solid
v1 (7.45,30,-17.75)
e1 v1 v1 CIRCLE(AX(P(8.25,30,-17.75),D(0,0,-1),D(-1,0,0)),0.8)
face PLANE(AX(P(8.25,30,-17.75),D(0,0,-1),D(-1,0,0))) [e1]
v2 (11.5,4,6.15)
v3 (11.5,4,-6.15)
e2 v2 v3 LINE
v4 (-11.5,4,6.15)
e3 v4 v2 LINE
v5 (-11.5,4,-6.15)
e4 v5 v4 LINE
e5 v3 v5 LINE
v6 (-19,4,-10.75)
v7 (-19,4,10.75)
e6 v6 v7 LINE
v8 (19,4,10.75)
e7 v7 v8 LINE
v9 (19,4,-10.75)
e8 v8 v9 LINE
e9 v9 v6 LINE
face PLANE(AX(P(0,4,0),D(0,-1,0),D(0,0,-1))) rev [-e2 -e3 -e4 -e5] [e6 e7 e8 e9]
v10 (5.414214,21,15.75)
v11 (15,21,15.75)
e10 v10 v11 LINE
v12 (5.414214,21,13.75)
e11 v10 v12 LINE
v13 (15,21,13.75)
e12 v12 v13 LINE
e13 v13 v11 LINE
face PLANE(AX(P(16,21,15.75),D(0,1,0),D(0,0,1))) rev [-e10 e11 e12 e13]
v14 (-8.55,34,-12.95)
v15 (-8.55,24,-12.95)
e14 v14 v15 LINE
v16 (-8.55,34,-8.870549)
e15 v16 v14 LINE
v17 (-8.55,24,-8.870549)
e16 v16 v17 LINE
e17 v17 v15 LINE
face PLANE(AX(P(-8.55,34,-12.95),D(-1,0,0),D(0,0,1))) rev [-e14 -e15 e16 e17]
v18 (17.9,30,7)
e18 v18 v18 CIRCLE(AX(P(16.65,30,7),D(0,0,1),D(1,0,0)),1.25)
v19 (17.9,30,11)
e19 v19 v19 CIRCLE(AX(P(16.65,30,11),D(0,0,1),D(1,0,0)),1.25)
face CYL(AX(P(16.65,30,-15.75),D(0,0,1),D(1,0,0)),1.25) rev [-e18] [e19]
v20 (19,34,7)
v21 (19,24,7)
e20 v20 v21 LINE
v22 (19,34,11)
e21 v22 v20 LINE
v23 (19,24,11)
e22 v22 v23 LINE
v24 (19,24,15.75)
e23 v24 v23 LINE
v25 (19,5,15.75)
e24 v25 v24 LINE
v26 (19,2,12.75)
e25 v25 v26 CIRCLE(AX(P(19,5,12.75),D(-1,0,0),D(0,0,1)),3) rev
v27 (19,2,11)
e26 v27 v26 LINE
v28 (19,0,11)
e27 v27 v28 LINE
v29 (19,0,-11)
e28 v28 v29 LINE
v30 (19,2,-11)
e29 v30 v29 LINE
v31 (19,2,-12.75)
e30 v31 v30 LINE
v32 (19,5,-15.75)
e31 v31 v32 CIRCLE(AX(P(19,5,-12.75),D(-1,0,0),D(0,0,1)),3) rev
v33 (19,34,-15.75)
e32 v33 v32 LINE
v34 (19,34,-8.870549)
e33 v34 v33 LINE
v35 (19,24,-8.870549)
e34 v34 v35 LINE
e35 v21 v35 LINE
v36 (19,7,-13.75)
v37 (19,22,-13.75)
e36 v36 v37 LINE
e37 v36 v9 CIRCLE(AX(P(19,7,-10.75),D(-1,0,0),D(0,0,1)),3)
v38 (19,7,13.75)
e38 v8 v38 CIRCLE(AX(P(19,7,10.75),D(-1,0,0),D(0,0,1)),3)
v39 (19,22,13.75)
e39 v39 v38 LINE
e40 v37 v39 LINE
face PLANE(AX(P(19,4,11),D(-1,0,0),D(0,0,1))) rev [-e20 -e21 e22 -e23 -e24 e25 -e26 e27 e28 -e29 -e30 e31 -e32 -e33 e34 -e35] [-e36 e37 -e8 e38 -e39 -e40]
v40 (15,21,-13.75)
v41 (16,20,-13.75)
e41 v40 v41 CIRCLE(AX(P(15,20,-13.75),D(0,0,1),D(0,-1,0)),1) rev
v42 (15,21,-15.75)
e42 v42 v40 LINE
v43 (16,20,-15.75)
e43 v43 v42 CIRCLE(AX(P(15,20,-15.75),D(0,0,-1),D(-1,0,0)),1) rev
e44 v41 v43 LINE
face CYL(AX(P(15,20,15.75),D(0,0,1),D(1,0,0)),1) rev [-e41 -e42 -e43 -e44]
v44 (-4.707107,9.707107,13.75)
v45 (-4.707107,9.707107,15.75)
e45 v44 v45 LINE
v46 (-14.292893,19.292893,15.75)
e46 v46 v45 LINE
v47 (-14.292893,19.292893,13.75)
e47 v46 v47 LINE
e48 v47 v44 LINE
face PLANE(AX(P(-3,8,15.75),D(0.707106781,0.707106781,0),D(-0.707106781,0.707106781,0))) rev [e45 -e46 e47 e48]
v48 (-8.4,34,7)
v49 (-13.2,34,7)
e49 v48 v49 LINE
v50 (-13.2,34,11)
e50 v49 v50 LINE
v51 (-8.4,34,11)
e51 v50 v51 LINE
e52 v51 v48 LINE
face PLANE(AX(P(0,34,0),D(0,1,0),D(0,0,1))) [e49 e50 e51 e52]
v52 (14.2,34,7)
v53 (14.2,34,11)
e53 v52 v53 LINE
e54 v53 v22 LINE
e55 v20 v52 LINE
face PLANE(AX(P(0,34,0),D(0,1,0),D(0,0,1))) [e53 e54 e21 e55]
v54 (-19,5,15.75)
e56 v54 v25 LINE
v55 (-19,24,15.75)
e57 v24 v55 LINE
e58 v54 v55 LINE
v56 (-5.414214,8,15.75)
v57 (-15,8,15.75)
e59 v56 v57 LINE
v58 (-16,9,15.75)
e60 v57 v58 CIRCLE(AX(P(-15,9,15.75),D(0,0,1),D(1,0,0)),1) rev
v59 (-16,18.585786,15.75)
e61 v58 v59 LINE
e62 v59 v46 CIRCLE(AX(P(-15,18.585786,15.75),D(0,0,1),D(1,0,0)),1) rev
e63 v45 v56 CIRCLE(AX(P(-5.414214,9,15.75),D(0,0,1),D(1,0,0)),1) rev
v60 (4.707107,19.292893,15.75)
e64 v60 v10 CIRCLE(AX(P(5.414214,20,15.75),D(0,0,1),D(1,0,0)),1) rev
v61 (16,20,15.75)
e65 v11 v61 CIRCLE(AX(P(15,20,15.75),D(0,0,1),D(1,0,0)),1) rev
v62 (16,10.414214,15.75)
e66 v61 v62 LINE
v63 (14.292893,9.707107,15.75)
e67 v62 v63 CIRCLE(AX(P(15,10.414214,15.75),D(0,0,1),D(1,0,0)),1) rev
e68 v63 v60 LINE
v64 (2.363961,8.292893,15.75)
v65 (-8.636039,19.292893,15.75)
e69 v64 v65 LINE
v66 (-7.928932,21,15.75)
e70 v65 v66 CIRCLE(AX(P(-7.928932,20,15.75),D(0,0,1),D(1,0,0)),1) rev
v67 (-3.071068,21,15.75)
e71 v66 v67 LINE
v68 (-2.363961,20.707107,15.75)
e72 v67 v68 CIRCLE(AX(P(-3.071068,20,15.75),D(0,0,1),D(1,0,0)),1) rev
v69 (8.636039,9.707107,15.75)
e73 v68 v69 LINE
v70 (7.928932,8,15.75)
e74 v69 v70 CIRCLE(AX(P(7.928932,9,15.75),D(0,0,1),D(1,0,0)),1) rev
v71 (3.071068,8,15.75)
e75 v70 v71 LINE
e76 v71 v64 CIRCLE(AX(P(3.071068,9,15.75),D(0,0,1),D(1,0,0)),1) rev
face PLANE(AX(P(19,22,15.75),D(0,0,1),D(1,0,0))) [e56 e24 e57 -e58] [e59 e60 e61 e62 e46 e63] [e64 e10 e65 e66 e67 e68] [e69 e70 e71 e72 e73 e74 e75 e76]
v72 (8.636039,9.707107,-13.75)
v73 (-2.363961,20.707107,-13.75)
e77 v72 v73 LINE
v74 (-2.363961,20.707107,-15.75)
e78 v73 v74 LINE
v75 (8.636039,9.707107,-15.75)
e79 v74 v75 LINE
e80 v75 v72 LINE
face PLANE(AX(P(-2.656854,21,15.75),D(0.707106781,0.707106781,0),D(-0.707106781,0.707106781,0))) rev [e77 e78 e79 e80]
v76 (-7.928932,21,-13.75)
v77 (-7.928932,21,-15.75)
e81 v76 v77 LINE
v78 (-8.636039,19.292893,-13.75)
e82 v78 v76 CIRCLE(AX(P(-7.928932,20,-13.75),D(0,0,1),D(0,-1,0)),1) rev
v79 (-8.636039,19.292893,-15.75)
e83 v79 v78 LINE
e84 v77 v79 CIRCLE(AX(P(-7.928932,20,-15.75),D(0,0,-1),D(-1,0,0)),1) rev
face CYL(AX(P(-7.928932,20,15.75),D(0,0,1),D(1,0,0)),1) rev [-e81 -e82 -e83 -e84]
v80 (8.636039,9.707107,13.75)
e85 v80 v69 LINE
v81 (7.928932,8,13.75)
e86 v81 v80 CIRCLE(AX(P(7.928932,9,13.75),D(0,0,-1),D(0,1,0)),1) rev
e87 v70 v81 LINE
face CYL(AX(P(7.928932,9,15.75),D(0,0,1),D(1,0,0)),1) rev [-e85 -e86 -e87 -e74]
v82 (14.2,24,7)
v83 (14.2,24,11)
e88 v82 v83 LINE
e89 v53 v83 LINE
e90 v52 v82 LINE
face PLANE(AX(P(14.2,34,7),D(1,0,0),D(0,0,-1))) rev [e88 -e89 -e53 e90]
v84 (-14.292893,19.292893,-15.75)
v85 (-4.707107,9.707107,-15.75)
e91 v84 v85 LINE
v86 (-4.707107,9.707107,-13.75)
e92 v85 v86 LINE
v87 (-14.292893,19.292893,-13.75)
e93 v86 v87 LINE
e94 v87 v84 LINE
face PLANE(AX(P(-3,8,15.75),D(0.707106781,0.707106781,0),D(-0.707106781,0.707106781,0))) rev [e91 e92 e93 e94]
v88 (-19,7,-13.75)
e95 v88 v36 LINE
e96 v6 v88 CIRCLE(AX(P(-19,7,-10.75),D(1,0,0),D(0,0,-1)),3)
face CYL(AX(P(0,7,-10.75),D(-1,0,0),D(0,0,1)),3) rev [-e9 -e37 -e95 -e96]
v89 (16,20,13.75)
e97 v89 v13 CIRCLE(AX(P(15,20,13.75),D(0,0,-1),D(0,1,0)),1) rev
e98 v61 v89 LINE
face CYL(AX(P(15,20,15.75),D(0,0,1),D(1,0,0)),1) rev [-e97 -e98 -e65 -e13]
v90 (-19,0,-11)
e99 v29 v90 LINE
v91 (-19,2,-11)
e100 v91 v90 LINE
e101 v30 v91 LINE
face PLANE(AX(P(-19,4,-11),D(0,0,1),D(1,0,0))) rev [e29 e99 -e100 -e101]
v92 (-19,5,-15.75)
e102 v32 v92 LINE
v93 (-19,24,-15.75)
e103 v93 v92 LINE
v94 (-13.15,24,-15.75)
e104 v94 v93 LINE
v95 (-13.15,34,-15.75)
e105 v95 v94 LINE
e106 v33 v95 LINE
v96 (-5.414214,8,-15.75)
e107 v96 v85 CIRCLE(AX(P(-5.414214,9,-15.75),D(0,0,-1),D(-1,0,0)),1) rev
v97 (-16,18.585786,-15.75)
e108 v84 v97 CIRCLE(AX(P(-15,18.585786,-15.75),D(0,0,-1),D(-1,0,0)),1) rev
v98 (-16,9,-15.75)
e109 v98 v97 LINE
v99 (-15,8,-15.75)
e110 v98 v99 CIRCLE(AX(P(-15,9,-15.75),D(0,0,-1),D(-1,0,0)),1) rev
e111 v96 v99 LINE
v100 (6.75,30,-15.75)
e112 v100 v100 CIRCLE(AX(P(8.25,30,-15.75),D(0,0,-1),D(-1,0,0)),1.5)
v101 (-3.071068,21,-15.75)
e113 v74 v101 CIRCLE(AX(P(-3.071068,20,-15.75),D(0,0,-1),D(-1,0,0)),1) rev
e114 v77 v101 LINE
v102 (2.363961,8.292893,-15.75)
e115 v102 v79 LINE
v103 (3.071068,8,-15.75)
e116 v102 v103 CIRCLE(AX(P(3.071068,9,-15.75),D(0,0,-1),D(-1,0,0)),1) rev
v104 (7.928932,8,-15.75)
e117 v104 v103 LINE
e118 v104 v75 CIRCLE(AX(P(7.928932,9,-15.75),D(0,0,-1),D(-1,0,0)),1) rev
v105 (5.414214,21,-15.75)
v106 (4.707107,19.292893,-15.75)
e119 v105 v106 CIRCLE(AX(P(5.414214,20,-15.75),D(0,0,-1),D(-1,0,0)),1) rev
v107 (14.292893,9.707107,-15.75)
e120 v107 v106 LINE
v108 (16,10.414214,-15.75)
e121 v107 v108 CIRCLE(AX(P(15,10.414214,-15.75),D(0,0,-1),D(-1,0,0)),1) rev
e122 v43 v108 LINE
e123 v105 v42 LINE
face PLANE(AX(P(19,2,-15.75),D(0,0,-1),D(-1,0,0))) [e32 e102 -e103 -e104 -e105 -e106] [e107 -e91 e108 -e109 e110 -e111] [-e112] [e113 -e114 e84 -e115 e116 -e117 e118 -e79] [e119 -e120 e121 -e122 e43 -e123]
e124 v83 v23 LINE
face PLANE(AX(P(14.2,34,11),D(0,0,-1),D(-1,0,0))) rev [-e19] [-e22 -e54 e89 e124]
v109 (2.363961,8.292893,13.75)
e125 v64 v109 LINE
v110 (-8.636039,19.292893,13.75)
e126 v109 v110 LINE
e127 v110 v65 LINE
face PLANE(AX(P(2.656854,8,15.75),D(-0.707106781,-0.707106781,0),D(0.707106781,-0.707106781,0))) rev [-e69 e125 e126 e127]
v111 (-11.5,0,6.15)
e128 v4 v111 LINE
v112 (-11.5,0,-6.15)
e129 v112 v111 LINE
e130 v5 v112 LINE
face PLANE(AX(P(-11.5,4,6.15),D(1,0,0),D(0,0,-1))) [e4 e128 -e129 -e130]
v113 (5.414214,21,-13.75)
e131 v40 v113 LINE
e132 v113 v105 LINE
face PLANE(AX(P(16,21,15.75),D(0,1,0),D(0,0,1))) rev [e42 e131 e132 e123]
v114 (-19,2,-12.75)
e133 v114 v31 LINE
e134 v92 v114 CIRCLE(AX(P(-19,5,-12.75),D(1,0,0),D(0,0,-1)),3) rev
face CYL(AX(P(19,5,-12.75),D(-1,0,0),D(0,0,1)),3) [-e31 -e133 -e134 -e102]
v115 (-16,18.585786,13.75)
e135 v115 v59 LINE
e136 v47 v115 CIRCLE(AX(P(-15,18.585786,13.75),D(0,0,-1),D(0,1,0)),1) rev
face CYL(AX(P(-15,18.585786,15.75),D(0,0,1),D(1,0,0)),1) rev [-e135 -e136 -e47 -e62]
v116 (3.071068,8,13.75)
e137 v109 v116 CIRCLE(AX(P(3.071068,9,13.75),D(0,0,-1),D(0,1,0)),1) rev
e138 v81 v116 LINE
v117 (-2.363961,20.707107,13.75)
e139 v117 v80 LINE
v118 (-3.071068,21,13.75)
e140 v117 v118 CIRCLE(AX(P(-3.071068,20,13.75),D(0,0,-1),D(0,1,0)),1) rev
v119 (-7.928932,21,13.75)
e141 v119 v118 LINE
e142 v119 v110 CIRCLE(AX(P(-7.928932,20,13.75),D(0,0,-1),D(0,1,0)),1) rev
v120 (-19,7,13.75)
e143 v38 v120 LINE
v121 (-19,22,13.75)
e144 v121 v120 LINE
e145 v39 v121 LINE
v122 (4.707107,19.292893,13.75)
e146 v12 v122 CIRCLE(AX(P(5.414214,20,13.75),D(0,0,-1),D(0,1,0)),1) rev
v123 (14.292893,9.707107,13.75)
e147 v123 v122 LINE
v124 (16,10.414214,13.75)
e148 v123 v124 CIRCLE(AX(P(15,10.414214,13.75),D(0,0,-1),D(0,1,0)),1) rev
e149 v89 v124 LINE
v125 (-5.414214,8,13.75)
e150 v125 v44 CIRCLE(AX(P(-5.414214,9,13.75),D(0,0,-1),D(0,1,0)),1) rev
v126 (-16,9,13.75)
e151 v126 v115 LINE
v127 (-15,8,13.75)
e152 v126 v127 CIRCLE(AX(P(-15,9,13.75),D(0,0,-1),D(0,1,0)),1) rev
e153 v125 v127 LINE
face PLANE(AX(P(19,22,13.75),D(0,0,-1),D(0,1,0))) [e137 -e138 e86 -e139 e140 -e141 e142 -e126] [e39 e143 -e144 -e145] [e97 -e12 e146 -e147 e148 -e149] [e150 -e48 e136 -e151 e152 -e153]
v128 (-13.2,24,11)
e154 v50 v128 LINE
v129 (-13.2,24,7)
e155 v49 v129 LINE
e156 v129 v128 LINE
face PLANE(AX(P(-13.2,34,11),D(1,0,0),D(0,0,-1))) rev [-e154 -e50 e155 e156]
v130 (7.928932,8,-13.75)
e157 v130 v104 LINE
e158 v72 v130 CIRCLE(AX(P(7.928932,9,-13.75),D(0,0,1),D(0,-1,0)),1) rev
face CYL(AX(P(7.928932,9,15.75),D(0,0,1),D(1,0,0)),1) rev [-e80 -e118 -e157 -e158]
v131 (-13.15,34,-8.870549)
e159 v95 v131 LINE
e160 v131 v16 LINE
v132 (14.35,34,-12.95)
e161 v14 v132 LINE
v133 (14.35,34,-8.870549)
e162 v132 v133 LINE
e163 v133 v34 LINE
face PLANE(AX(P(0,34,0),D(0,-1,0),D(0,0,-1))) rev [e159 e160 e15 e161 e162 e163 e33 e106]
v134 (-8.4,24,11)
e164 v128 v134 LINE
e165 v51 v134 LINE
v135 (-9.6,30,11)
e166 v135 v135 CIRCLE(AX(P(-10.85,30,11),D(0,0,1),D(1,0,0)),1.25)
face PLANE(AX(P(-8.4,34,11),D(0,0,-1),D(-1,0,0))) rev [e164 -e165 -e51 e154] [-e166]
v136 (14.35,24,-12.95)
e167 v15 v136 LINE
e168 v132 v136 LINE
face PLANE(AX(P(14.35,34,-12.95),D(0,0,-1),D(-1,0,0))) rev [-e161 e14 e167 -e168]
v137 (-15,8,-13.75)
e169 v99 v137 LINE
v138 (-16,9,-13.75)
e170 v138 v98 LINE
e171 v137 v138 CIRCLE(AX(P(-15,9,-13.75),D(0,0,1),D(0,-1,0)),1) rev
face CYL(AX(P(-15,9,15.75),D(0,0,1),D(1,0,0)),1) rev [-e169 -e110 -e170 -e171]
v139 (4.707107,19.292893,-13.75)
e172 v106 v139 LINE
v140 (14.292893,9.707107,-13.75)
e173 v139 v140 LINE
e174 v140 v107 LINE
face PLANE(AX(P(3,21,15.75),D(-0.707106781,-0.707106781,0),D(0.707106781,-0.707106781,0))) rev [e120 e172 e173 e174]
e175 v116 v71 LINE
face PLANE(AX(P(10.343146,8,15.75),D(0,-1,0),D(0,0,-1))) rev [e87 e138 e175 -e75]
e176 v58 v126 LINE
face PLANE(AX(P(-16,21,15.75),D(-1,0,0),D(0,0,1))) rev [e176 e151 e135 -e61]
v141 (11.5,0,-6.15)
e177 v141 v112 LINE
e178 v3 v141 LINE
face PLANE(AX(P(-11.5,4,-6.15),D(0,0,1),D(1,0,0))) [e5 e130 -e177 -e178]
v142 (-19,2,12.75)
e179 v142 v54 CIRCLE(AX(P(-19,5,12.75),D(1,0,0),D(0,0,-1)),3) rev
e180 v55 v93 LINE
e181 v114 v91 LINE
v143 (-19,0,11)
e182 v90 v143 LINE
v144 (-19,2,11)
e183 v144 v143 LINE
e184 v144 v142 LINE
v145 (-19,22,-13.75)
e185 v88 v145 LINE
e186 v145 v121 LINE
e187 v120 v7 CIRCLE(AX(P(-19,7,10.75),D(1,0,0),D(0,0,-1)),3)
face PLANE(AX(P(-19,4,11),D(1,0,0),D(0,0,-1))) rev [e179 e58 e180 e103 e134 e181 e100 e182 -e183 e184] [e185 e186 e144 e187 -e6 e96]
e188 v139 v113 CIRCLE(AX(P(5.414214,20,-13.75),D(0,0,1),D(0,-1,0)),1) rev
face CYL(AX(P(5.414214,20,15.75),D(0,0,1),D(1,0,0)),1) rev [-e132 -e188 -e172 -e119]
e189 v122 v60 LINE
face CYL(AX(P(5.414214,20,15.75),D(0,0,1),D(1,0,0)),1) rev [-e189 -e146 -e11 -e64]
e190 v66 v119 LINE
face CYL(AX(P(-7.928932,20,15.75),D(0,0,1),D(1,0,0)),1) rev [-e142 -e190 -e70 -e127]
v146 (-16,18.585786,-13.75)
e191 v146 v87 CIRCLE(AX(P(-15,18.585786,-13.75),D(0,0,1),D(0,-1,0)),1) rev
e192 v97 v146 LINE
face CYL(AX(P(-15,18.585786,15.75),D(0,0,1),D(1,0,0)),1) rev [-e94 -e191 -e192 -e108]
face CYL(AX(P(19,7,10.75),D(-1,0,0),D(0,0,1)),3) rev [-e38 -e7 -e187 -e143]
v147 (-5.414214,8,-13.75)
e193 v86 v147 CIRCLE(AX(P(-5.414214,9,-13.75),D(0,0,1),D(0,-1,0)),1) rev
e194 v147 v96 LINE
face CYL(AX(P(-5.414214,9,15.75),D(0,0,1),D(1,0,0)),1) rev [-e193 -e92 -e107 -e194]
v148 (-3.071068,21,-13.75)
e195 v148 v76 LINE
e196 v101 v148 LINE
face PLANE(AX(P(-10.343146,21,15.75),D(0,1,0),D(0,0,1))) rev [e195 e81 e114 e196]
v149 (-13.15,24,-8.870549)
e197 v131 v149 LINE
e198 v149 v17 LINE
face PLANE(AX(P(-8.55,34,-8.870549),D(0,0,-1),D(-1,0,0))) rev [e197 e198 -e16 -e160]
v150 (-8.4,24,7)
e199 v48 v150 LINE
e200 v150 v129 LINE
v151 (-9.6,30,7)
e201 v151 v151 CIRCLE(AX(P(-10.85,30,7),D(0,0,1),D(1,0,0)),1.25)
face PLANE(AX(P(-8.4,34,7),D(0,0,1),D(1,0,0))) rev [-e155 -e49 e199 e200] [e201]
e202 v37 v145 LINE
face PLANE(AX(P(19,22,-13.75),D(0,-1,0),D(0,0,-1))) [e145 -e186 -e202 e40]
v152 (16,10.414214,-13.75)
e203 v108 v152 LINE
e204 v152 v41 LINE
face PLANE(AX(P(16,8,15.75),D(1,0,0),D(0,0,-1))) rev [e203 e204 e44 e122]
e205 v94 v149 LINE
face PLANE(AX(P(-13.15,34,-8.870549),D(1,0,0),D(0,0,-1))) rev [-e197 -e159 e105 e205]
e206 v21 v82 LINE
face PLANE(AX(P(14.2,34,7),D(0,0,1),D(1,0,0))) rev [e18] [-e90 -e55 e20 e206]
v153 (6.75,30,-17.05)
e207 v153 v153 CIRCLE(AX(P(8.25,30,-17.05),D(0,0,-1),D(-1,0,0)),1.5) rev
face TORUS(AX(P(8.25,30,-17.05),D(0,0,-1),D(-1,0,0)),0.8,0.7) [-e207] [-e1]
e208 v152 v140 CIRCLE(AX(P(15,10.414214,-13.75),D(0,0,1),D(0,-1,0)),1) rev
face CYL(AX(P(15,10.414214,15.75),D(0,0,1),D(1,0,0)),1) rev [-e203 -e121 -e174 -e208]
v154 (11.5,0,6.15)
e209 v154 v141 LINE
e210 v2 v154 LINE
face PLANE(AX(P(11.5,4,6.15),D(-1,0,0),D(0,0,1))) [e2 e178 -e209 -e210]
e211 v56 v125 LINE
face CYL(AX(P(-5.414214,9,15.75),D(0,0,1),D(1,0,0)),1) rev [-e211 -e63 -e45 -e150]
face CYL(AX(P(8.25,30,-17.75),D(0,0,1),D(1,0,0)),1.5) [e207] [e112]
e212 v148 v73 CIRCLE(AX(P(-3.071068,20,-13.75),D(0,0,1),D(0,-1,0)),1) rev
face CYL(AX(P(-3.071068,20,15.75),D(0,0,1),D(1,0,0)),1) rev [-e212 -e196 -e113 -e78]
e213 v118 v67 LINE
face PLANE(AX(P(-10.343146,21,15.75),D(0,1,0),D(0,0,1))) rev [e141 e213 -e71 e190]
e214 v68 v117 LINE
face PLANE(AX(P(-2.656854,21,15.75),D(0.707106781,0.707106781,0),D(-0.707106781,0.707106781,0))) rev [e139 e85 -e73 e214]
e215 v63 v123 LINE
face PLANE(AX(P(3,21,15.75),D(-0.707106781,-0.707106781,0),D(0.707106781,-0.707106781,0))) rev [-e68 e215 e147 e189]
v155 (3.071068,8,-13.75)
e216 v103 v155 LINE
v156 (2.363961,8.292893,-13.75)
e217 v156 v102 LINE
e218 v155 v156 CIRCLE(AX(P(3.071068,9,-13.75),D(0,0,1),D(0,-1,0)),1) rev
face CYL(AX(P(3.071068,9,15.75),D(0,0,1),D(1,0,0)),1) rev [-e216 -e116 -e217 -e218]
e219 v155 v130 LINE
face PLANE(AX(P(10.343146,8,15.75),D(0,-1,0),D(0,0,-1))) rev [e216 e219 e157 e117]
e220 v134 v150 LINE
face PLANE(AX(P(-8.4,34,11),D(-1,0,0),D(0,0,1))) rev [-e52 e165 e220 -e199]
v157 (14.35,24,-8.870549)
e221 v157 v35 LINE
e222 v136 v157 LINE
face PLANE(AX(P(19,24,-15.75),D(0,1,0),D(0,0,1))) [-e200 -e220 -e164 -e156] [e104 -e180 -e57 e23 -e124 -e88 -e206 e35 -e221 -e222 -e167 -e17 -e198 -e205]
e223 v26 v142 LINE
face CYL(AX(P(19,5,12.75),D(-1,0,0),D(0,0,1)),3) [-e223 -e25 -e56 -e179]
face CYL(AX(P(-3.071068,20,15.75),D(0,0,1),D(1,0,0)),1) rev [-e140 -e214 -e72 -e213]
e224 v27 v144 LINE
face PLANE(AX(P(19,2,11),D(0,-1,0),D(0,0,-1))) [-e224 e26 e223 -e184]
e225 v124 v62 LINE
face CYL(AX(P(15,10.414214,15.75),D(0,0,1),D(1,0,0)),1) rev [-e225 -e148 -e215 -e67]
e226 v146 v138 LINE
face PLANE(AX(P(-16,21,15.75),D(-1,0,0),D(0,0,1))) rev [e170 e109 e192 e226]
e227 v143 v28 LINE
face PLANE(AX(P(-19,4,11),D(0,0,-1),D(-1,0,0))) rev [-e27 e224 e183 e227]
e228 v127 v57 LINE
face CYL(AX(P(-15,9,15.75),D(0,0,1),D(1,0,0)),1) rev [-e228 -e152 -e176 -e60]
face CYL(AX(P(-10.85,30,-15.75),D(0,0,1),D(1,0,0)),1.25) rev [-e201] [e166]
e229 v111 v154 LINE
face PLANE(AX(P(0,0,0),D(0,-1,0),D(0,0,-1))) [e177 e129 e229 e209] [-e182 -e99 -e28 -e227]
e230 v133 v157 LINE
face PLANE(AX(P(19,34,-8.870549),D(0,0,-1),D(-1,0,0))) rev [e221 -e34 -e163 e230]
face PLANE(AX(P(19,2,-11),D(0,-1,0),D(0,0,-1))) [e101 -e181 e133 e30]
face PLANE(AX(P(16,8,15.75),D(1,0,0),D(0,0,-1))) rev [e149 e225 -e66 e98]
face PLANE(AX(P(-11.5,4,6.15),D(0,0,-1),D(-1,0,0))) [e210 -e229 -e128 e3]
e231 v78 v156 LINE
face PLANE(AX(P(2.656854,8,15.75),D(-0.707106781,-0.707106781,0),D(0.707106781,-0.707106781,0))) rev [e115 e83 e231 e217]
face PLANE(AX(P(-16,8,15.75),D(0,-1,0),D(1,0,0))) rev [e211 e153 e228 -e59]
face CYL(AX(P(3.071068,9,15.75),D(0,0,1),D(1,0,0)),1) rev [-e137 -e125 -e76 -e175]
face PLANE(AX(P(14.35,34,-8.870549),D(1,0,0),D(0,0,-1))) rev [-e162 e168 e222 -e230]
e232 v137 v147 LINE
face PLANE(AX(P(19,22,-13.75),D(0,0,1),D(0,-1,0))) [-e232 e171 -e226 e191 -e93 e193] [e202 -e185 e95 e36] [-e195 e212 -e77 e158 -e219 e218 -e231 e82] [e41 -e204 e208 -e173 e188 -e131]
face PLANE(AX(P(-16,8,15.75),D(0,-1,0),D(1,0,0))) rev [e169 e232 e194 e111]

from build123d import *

# Parameters (mm, degrees)
SKETCH1_W           = 38
SKETCH1_H           = 22
SKETCH1_W_2         = 23
SKETCH1_H_2         = 12.3
BOSS_EXTRUDE1_DEPTH = 4
BOSS_EXTRUDE2_DEPTH = 38
FILLET1_R           = 3
CUT_EXTRUDE5_DEPTH  = 44.923228479
FILLET3_R           = 1
MIRROR1_START       = 13.75
MIRROR1_DEPTH       = 2
SKETCH10_W          = 4.8
SKETCH10_H          = 4
BOSS_EXTRUDE4_DEPTH = 10
SKETCH11_R          = 1.25
CUT_EXTRUDE6_DEPTH  = 48.25
BOSS_EXTRUDE5_DEPTH = 10
BOSS_EXTRUDE6_START = -15.75
SKETCH14_R          = 1.5
BOSS_EXTRUDE6_DEPTH = 2
FILLET4_R           = 0.7


# Read off the part's stored shape, not the designer's step: Mirror1
with BuildPart() as part:
    # Sketch1 → Boss-Extrude1 (new body)
    with BuildSketch(Plane(origin=(0, 0, 0), x_dir=(1, 0, 0), z_dir=(0, 1, 0))):
        Rectangle(SKETCH1_W, SKETCH1_H)
        Rectangle(SKETCH1_W_2, SKETCH1_H_2, mode=Mode.SUBTRACT)
    extrude(amount=BOSS_EXTRUDE1_DEPTH)

    # Sketch2 → Boss-Extrude2 (add)
    with BuildSketch(Plane.ZY.offset(19)):
        Polygon((-11, 2), (-15.75, 2), (-15.75, 22), (-15.75, 24), (15.75, 24), (15.75, 22), (15.75, 2), (11, 2), (11, 4), (13.75, 4), (13.75, 22), (-13.75, 22), (-13.75, 4), (-11, 4), align=None)
    extrude(amount=-BOSS_EXTRUDE2_DEPTH)

    # Fillet1
    fillet1_edges = [part.edges().sort_by_distance(p)[0] for p in [
        (0, 2, -15.75),
        (0, 2, 15.75),
        (0, 4, 13.75),
        (0, 4, -13.75),
    ]]
    fillet(fillet1_edges, radius=FILLET1_R)

    # Sketch8 → Cut-Extrude5 (cut, through all)
    with BuildSketch(Plane(origin=(0, 0, -15.75), x_dir=(-1, 0, 0), z_dir=(0, 0, -1))):
        Polygon((-16, 8), (-16, 21), (-3, 21), align=None)
        Polygon((3, 8), (16, 21), (16, 8), align=None)
        Polygon((-10.343145751, 8), (-2.656854249, 8), (10.343145751, 21), (2.656854249, 21), align=None)
    extrude(amount=-CUT_EXTRUDE5_DEPTH, mode=Mode.SUBTRACT)

    # Fillet3
    fillet3_edges = [part.edges().sort_by_distance(p)[0] for p in [
        (-16, 8, -14.75),
        (-3, 8, -14.75),
        (-16, 21, -14.75),
        (10.343145751, 8, -14.75),
        (-2.656854249, 21, -14.75),
        (-10.343145751, 21, -14.75),
        (2.656854249, 8, -14.75),
        (3, 21, -14.75),
        (16, 8, -14.75),
        (16, 21, -14.75),
    ]]
    fillet(fillet3_edges, radius=FILLET3_R)

    # Mirror1 outline → Mirror1 (add)
    with BuildSketch(Plane.XY.offset(MIRROR1_START)):
        with BuildLine():
            ThreePointArc((15, 21), (15.707106781, 20.707106781), (16, 20))
            Line((16, 20), (16, 21))
            Line((16, 21), (15, 21))
        make_face()
        with BuildLine():
            Line((16, 8), (16, 10.414213562))
            ThreePointArc((16, 10.414213562), (15.382683432, 9.49033403), (14.292893219, 9.707106781))
            Line((14.292893219, 9.707106781), (16, 8))
        make_face()
        with BuildLine():
            ThreePointArc((4.707106781, 19.292893219), (4.49033403, 20.382683432), (5.414213562, 21))
            Line((5.414213562, 21), (3, 21))
            Line((3, 21), (4.707106781, 19.292893219))
        make_face()
        with BuildLine():
            ThreePointArc((-15, 8), (-15.707106781, 8.292893219), (-16, 9))
            Line((-16, 9), (-16, 8))
            Line((-16, 8), (-15, 8))
        make_face()
        with BuildLine():
            Line((-16, 21), (-16, 18.585786438))
            ThreePointArc((-16, 18.585786438), (-15.382683432, 19.50966597), (-14.292893219, 19.292893219))
            Line((-14.292893219, 19.292893219), (-16, 21))
        make_face()
        with BuildLine():
            ThreePointArc((-4.707106781, 9.707106781), (-4.49033403, 8.617316568), (-5.414213562, 8))
            Line((-5.414213562, 8), (-3, 8))
            Line((-3, 8), (-4.707106781, 9.707106781))
        make_face()
        with BuildLine():
            ThreePointArc((8.636038969, 9.707106781), (8.852811721, 8.617316567), (7.928932188, 8))
            Line((7.928932188, 8), (10.343145751, 8))
            Line((10.343145751, 8), (8.636038969, 9.707106781))
        make_face()
        with BuildLine():
            Line((2.656854249, 8), (3.071067812, 8))
            ThreePointArc((3.071067812, 8), (2.68838438, 8.076120467), (2.363961031, 8.292893219))
            Line((2.363961031, 8.292893219), (2.656854249, 8))
        make_face()
        with BuildLine():
            ThreePointArc((-3.071067812, 21), (-2.68838438, 20.923879533), (-2.363961031, 20.707106781))
            Line((-2.363961031, 20.707106781), (-2.656854249, 21))
            Line((-2.656854249, 21), (-3.071067812, 21))
        make_face()
        with BuildLine():
            Line((-10.343145751, 21), (-8.636038969, 19.292893219))
            ThreePointArc((-8.636038969, 19.292893219), (-8.852811721, 20.382683433), (-7.928932188, 21))
            Line((-7.928932188, 21), (-10.343145751, 21))
        make_face()
    extrude(amount=MIRROR1_DEPTH)

    # Sketch10 → Boss-Extrude4 (add)
    with BuildSketch(Plane(origin=(0, 24, 0), x_dir=(1, 0, 0), z_dir=(0, 1, 0))):
        with Locations((-10.8, -9)):
            Rectangle(SKETCH10_W, SKETCH10_H)
        with Locations((16.6, -9)):
            Rectangle(SKETCH10_W, SKETCH10_H)
    extrude(amount=BOSS_EXTRUDE4_DEPTH)

    # Sketch11 → Cut-Extrude6 (cut, through all)
    with BuildSketch(Plane.XY.offset(11)):
        with Locations((16.65, 30)):
            Circle(SKETCH11_R)
        with Locations((-10.85, 30)):
            Circle(SKETCH11_R)
    extrude(amount=-CUT_EXTRUDE6_DEPTH, mode=Mode.SUBTRACT)

    # Sketch12 → Boss-Extrude5 (add)
    with BuildSketch(Plane(origin=(0, 24, 0), x_dir=(1, 0, 0), z_dir=(0, 1, 0))):
        Polygon((-8.55, 8.870549132), (-13.15, 8.870549132), (-13.15, 15.75), (19, 15.75), (19, 8.870549132), (14.35, 8.870549132), (14.35, 12.95), (-8.55, 12.95), align=None)
    extrude(amount=BOSS_EXTRUDE5_DEPTH)

    # Sketch14 → Boss-Extrude6 (add)
    with BuildSketch(Plane.XY.offset(BOSS_EXTRUDE6_START)):
        with Locations(Location((8.25, 30, 0), (0, 0, 180))):
            Circle(SKETCH14_R)
    extrude(amount=-BOSS_EXTRUDE6_DEPTH)

    # Fillet4
    fillet4_edges = [part.edges().sort_by_distance(p)[0] for p in [
        (9.75, 30, -17.75),
    ]]
    fillet(fillet4_edges, radius=FILLET4_R)


solid = part.part
